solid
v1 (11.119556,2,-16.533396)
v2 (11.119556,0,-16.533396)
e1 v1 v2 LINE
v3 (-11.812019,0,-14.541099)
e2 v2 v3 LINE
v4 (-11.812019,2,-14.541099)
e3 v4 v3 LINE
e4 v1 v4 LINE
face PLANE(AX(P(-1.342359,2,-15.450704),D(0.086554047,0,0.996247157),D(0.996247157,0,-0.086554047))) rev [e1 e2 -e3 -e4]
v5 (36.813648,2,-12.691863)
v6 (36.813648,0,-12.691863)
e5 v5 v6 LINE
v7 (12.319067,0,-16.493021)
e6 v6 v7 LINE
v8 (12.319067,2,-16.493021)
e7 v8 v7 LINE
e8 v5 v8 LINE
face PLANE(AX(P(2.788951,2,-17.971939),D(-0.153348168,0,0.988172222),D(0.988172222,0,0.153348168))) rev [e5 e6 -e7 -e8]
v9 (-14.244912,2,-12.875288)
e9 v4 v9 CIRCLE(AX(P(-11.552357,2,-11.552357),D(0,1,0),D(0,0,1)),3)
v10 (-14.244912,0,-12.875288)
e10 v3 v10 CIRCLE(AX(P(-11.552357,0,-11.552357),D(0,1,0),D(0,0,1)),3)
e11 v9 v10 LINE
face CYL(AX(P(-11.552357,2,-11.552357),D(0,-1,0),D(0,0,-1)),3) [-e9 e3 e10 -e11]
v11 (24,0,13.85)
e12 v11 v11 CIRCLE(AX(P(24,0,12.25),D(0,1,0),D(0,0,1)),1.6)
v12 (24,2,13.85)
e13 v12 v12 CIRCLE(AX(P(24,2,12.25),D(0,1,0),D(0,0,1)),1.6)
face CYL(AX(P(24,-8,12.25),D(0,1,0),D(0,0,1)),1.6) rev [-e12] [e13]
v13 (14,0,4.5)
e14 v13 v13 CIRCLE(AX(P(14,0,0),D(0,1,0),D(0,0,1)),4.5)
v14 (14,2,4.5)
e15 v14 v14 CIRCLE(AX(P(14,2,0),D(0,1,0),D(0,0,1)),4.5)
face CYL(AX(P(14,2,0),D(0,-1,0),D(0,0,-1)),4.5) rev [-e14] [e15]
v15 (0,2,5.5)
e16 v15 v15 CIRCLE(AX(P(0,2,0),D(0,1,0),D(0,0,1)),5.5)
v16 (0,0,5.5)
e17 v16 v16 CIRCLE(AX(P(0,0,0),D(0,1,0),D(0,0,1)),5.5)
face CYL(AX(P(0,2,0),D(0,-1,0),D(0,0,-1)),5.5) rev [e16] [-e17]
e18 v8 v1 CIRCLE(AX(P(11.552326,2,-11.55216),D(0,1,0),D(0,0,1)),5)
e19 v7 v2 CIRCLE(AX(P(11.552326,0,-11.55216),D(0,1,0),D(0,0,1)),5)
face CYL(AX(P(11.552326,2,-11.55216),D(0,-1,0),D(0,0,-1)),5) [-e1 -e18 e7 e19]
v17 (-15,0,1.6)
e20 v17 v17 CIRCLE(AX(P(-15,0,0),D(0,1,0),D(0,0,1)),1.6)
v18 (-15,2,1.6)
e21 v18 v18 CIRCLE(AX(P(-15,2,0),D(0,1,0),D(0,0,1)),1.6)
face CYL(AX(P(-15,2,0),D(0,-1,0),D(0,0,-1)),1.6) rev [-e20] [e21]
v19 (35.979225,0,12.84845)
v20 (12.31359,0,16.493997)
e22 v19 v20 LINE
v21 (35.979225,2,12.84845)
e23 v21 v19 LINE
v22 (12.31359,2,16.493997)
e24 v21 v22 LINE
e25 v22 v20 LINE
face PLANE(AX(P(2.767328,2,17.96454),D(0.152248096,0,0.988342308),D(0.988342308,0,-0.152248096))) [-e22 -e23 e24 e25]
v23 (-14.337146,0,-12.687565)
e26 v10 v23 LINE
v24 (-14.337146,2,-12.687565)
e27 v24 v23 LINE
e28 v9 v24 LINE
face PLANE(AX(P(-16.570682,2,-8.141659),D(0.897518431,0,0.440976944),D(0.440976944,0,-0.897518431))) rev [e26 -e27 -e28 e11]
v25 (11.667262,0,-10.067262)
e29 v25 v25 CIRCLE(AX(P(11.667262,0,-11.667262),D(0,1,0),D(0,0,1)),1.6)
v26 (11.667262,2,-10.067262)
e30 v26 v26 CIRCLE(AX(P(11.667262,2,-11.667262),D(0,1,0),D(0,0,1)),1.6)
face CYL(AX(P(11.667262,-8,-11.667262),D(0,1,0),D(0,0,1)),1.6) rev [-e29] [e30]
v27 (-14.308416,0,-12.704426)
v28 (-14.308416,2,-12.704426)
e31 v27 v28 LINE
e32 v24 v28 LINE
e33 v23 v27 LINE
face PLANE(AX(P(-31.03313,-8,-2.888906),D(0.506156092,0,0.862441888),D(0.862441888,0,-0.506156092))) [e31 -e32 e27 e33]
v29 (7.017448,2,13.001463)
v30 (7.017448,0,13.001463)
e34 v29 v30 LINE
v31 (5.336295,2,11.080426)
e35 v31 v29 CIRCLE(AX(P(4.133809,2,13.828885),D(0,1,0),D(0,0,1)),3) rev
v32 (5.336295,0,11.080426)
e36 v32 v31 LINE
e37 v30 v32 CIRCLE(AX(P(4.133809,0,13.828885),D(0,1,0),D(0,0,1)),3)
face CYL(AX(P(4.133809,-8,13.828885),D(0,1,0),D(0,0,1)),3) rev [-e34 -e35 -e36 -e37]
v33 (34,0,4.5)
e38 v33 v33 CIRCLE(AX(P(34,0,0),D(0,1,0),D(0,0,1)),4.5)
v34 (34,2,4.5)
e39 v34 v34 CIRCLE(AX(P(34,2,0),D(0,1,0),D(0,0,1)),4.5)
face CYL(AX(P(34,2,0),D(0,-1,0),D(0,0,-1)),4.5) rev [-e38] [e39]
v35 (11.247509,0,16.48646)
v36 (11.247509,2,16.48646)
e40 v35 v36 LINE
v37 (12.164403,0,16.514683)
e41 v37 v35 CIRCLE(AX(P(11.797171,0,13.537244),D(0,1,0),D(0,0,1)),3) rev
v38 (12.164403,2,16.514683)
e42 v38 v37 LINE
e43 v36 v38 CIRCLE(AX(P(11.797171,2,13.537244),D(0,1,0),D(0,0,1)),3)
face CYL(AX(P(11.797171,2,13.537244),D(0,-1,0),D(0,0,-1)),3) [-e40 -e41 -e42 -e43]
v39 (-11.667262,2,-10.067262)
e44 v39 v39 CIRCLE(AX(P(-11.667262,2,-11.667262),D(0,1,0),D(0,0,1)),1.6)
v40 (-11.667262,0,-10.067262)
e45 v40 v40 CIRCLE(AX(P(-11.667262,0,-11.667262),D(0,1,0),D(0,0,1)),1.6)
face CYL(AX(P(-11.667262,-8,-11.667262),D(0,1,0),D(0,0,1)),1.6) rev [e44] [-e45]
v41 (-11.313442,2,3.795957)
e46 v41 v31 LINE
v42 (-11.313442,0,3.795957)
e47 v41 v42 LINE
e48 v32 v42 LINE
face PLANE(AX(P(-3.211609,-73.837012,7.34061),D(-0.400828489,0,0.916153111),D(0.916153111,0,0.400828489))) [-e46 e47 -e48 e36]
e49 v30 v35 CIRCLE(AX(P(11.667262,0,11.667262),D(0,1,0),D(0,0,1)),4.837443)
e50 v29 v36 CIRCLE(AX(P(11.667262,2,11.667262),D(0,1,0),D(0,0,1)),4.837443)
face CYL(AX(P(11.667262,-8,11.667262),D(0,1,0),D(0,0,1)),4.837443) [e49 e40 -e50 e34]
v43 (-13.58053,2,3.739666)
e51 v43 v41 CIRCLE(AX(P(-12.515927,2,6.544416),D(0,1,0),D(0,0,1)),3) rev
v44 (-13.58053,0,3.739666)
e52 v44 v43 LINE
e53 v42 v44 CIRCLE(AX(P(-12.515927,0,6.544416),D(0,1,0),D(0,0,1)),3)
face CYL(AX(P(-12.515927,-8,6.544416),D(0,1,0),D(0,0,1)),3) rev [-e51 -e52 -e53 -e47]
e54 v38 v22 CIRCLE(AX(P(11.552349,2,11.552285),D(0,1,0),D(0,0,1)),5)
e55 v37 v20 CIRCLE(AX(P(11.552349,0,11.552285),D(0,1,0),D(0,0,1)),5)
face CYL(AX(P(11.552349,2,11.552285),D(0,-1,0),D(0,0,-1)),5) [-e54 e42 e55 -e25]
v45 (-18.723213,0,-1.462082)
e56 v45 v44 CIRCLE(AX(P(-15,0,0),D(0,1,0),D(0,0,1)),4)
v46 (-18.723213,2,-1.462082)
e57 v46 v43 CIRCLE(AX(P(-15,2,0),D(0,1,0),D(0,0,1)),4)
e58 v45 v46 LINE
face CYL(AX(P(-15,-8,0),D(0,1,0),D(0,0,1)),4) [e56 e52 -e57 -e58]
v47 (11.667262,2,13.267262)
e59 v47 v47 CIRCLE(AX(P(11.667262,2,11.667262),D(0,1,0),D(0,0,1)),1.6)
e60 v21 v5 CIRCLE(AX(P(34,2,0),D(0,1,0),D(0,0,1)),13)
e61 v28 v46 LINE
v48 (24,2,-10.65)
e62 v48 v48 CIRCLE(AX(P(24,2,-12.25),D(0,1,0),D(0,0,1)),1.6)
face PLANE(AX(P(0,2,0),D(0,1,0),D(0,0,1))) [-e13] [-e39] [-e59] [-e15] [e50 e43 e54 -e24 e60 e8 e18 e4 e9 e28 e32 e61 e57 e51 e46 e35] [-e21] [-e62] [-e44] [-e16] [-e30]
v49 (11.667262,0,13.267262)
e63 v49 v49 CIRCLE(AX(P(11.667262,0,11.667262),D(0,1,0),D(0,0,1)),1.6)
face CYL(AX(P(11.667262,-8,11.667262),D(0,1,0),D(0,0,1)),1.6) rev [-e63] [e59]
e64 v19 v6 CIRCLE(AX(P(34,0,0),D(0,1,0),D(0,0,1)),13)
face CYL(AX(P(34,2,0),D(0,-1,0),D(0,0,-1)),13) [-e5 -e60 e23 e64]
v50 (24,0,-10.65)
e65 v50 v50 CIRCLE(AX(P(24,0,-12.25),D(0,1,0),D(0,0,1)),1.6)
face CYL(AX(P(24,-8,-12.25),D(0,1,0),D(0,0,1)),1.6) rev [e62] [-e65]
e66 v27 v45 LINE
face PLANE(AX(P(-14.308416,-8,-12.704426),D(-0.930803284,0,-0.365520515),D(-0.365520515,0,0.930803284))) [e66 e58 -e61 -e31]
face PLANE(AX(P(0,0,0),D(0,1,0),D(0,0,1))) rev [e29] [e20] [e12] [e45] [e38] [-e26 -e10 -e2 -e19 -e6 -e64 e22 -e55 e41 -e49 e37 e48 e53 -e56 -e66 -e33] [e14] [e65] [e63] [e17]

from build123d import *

# Parameters (mm, degrees)
SKETCH1_R           = 1.6
SKETCH1_R_2         = 1
SKETCH1_R_3         = 5.5
SKETCH1_R_4         = 4.5
BOSS_EXTRUDE2_DEPTH = 2
BOSS_EXTRUDE3_START = -2
SKETCH2_R           = 1
BOSS_EXTRUDE3_DEPTH = 2
SKETCH3_R           = 1
CUT_EXTRUDE1_DEPTH  = 103
BOSS_EXTRUDE4_START = -2
SKETCH4_R           = 1.6
BOSS_EXTRUDE4_DEPTH = 2
SKETCH5_R           = 1.6
CUT_EXTRUDE2_DEPTH  = 10
SKETCH6_R           = 1.6
CUT_EXTRUDE3_DEPTH  = 10
BOSS_EXTRUDE5_DEPTH = 2
CUT_EXTRUDE4_DEPTH  = 10
SKETCH10_R          = 1.6
SKETCH10_R_2        = 5.5
SKETCH10_R_3        = 4.5
BOSS_EXTRUDE6_DEPTH = 2
FILLET2_START       = -1
FILLET2_DEPTH       = 4
FILLET2_2_DEPTH     = 2


with BuildPart() as part:
    # Sketch1 → Boss-Extrude2 (new body)
    with BuildSketch(Plane(origin=(0, 0, 0), x_dir=(1, 0, 0), z_dir=(0, 1, 0))):
        with BuildLine():
            Line((12.313589515, -16.493996637), (35.979225245, -12.848450001))
            ThreePointArc((35.979225245, -12.848450001), (46.993067566, -0.424494085), (36.813648041, 12.691862933))
            Line((36.813648041, 12.691862933), (35.165189196, 12.947676785))
            Line((35.165189196, 12.947676785), (12.319067304, 16.493021261))
            ThreePointArc((12.319067304, 16.493021261), (11.720527595, 16.549330191), (11.119556233, 16.533395936))
            Line((11.119556233, 16.533395936), (-11.812019178, 14.541098507))
            ThreePointArc((-11.812019178, 14.541098507), (-13.247239988, 14.027709898), (-14.244912332, 12.87528787))
            Line((-14.244912332, 12.87528787), (-19.487592157, 2.204884721))
            ThreePointArc((-19.487592157, 2.204884721), (-19.693653105, -1.723258696), (-16.994761113, -4.584858569))
            Line((-16.994761113, -4.584858569), (9.557587922, -16.137143667))
            ThreePointArc((9.557587922, -16.137143667), (10.910298182, -16.51089082), (12.313589515, -16.493996637))
        make_face()
        with Locations(Location((11.552349036, -11.552285098, 0), (0, 0, 270))):
            Circle(SKETCH1_R, mode=Mode.SUBTRACT)
        with Locations(Location((25, -11, 0), (0, 0, 270))):
            Circle(SKETCH1_R_2, mode=Mode.SUBTRACT)
        with Locations(Location((-15, 0, 0), (0, 0, 270))):
            Circle(SKETCH1_R, mode=Mode.SUBTRACT)
        with Locations(Location((0, 0, 0), (0, 0, 270))):
            Circle(SKETCH1_R_3, mode=Mode.SUBTRACT)
        with Locations(Location((-11.552357038, 11.552357038, 0), (0, 0, 270))):
            Circle(SKETCH1_R, mode=Mode.SUBTRACT)
        with Locations(Location((11.552326466, 11.552160153, 0), (0, 0, 270))):
            Circle(SKETCH1_R, mode=Mode.SUBTRACT)
        with Locations(Location((14, 0, 0), (0, 0, 270))):
            Circle(SKETCH1_R_4, mode=Mode.SUBTRACT)
        with Locations(Location((34, 0, 0), (0, 0, 270))):
            Circle(SKETCH1_R_4, mode=Mode.SUBTRACT)
        with Locations(Location((25, 11, 0), (0, 0, 270))):
            Circle(SKETCH1_R_2, mode=Mode.SUBTRACT)
    extrude(amount=BOSS_EXTRUDE2_DEPTH)

    # Sketch2 → Boss-Extrude3 (add)
    with BuildSketch(Plane(origin=(0, 2, 0), x_dir=(1, 0, 0), z_dir=(0, 1, 0)).offset(BOSS_EXTRUDE3_START)):
        with Locations((25, 11)):
            Circle(SKETCH2_R)
        with Locations((25, -11)):
            Circle(SKETCH2_R)
    extrude(amount=BOSS_EXTRUDE3_DEPTH)

    # Sketch3 → Cut-Extrude1 (cut)
    with BuildSketch(Plane(origin=(0, 2, 0), x_dir=(1, 0, 0), z_dir=(0, 1, 0))):
        with Locations(Location((24, 13, 0), (0, 0, 270))):
            Circle(SKETCH3_R)
        with Locations(Location((24, -13, 0), (0, 0, 270))):
            Circle(SKETCH3_R)
    extrude(amount=-CUT_EXTRUDE1_DEPTH, mode=Mode.SUBTRACT)

    # Sketch4 → Boss-Extrude4 (add)
    with BuildSketch(Plane(origin=(0, 2, 0), x_dir=(1, 0, 0), z_dir=(0, 1, 0)).offset(BOSS_EXTRUDE4_START)):
        with Locations((-11.552357038, 11.552357038)):
            Circle(SKETCH4_R)
        with Locations((11.552326466, 11.552160153)):
            Circle(SKETCH4_R)
        with Locations((11.552349036, -11.552285098)):
            Circle(SKETCH4_R)
    extrude(amount=BOSS_EXTRUDE4_DEPTH)

    # Sketch5 → Cut-Extrude2 (cut)
    with BuildSketch(Plane(origin=(0, 2, 0), x_dir=(1, 0, 0), z_dir=(0, 1, 0))):
        with Locations(Location((-11.66726189, 11.66726189, 0), (0, 0, 270))):
            Circle(SKETCH5_R)
        with Locations(Location((11.66726189, 11.66726189, 0), (0, 0, 270))):
            Circle(SKETCH5_R)
        with Locations(Location((11.66726189, -11.66726189, 0), (0, 0, 270))):
            Circle(SKETCH5_R)
    extrude(amount=-CUT_EXTRUDE2_DEPTH, mode=Mode.SUBTRACT)

    # Sketch6 → Cut-Extrude3 (cut)
    with BuildSketch(Plane(origin=(0, 2, 0), x_dir=(1, 0, 0), z_dir=(0, 1, 0))):
        with Locations((24, 12.25)):
            Circle(SKETCH6_R)
        with Locations((24, -12.25)):
            Circle(SKETCH6_R)
    extrude(amount=-CUT_EXTRUDE3_DEPTH, mode=Mode.SUBTRACT)

    # Sketch7 → Boss-Extrude5 (add)
    with BuildSketch(Plane(origin=(0, 2, 0), x_dir=(1, 0, 0), z_dir=(0, 1, 0))):
        with BuildLine():
            ThreePointArc((24.746843357, 13.665), (24, 14), (23.253156643, 13.665))
            ThreePointArc((23.253156643, 13.665), (24, 13.85), (24.746843357, 13.665))
        make_face()
        with BuildLine():
            ThreePointArc((23.253156643, -13.665), (24, -13.85), (24.746843357, -13.665))
            ThreePointArc((24.746843357, -13.665), (24, -14), (23.253156643, -13.665))
        make_face()
    extrude(amount=-BOSS_EXTRUDE5_DEPTH)

    # Sketch8 → Cut-Extrude4 (cut)
    with BuildSketch(Plane(origin=(0, 2, 0), x_dir=(1, 0, 0), z_dir=(0, 1, 0))):
        with BuildLine():
            Line((-14.308416207, 12.704426351), (-18.723213135, 1.462082061))
            ThreePointArc((-18.723213135, 1.462082061), (-16.986293656, -3.471978904), (-11.852582747, -2.468555172))
            Line((-11.852582747, -2.468555172), (6.930322315, -10.68631196))
            ThreePointArc((6.930322315, -10.68631196), (7.786759617, -14.555611143), (11.247508844, -16.486459611))
            Line((11.247508844, -16.486459611), (11.232461738, -16.659215907))
            Line((11.232461738, -16.659215907), (-9.768707716, -29.444072038))
            Line((-9.768707716, -29.444072038), (-31.03313029, 2.888905984))
            Line((-31.03313029, 2.888905984), (-14.308416207, 12.704426351))
        make_face()
    extrude(amount=-CUT_EXTRUDE4_DEPTH, mode=Mode.SUBTRACT)

    # Sketch10 → Boss-Extrude6 (add)
    # profile 1 of 3: a face of its own
    with BuildSketch(Plane(origin=(0, 2, 0), x_dir=(1, 0, 0), z_dir=(0, 1, 0))):
        with BuildLine():
            Line((6.930322315, -10.68631196), (-2.461130216, -6.577433566))
            Line((-2.461130216, -6.577433566), (-2.861958704, -7.493586677))
            Line((-2.861958704, -7.493586677), (6.830279674, -11.734062656))
            ThreePointArc((6.830279674, -11.734062656), (6.851720384, -11.207458338), (6.930322315, -10.68631196))
        make_face()
    # profile 2 of 3: a face of its own
    with BuildSketch(Plane(origin=(0, 2, 0), x_dir=(1, 0, 0), z_dir=(0, 1, 0))):
        with BuildLine():
            Line((-2.861958704, -7.493586677), (-2.461130216, -6.577433566))
            Line((-2.461130216, -6.577433566), (-11.852582747, -2.468555172))
            ThreePointArc((-11.852582747, -2.468555172), (-12.214781898, -2.870985915), (-12.628009506, -3.220816837))
            Line((-12.628009506, -3.220816837), (-2.861958704, -7.493586677))
        make_face()
    # profile 3 of 3: a face of its own
    with BuildSketch(Plane(origin=(0, 2, 0), x_dir=(1, 0, 0), z_dir=(0, 1, 0))):
        with BuildLine():
            Line((8.035421862, -12.261327493), (6.830279674, -11.734062656))
            ThreePointArc((6.830279674, -11.734062656), (8.124009767, -14.960622436), (11.247508844, -16.486459611))
            Line((11.247508844, -16.486459611), (11.242611849, -16.542682164))
            ThreePointArc((11.242611849, -16.542682164), (11.779409327, -16.5471268), (12.313589515, -16.493996637))
            Line((12.313589515, -16.493996637), (35.979225245, -12.848450001))
            ThreePointArc((35.979225245, -12.848450001), (46.993067566, -0.424494085), (36.813648041, 12.691862933))
            Line((36.813648041, 12.691862933), (12.319067304, 16.493021261))
            ThreePointArc((12.319067304, 16.493021261), (11.720527595, 16.549330191), (11.119556233, 16.533395936))
            Line((11.119556233, 16.533395936), (-11.812019178, 14.541098507))
            ThreePointArc((-11.812019178, 14.541098507), (-13.247239988, 14.027709898), (-14.244912332, 12.87528787))
            Line((-14.244912332, 12.87528787), (-14.337145922, 12.68756525))
            Line((-14.337145922, 12.68756525), (-14.308416207, 12.704426351))
            Line((-14.308416207, 12.704426351), (-18.723213135, 1.462082061))
            ThreePointArc((-18.723213135, 1.462082061), (-17.436972748, -3.171933767), (-12.628009506, -3.220816837))
            Line((-12.628009506, -3.220816837), (-13.301998386, -2.925938239))
            Line((-13.301998386, -2.925938239), (-11.820094843, -1.440006983))
            Line((-11.820094843, -1.440006983), (-1.105948659, -6.127580457))
            Line((-1.105948659, -6.127580457), (8.611687481, -8.831618339))
            Line((8.611687481, -8.831618339), (8.035421862, -12.261327493))
        make_face()
        with Locations(Location((11.66726189, -11.66726189, 0), (0, 0, 270))):
            Circle(SKETCH10_R, mode=Mode.SUBTRACT)
        with Locations(Location((24, -12.25, 0), (0, 0, 270))):
            Circle(SKETCH10_R, mode=Mode.SUBTRACT)
        with Locations(Location((-15, 0, 0), (0, 0, 270))):
            Circle(SKETCH10_R, mode=Mode.SUBTRACT)
        with Locations(Location((0, 0, 0), (0, 0, 270))):
            Circle(SKETCH10_R_2, mode=Mode.SUBTRACT)
        with Locations(Location((-11.66726189, 11.66726189, 0), (0, 0, 270))):
            Circle(SKETCH10_R, mode=Mode.SUBTRACT)
        with Locations(Location((11.66726189, 11.66726189, 0), (0, 0, 270))):
            Circle(SKETCH10_R, mode=Mode.SUBTRACT)
        with Locations(Location((14, 0, 0), (0, 0, 270))):
            Circle(SKETCH10_R_3, mode=Mode.SUBTRACT)
        with Locations(Location((34, 0, 0), (0, 0, 270))):
            Circle(SKETCH10_R_3, mode=Mode.SUBTRACT)
        with Locations(Location((24, 12.25, 0), (0, 0, 270))):
            Circle(SKETCH10_R, mode=Mode.SUBTRACT)
    extrude(amount=-BOSS_EXTRUDE6_DEPTH)

    # Fillet2: read off the stored shape, not the designer's step
    # Fillet2 outline → Fillet2 (cut)
    with BuildSketch(Plane(origin=(0, 0, 0), x_dir=(1, 0, 0), z_dir=(0, 1, 0)).offset(FILLET2_START)):
        with BuildLine():
            ThreePointArc((11.242611849, -16.542682164), (11.704154362, -16.549980081), (12.16440304, -16.514682694))
            ThreePointArc((12.16440304, -16.514682694), (11.70487082, -16.535823924), (11.247508844, -16.486459611))
            Line((11.247508844, -16.486459611), (11.242611849, -16.542682164))
        make_face()
    extrude(amount=FILLET2_DEPTH, mode=Mode.SUBTRACT)

    # Fillet2 2 outline → Fillet2 2 (add)
    with BuildSketch(Plane(origin=(0, 0, 0), x_dir=(1, 0, 0), z_dir=(0, 1, 0))):
        with BuildLine():
            ThreePointArc((-13.580529798, -3.739666341), (-12.441461916, -3.545340418), (-11.313441681, -3.795956765))
            Line((-11.313441681, -3.795956765), (-12.628009506, -3.220816837))
            ThreePointArc((-12.628009506, -3.220816837), (-13.086601256, -3.512677788), (-13.580529798, -3.739666341))
        make_face()
        with BuildLine():
            ThreePointArc((5.336294885, -11.080425553), (6.391396593, -11.853207748), (7.01744839, -13.001463417))
            ThreePointArc((7.01744839, -13.001463417), (6.88172123, -12.373986651), (6.830279674, -11.734062656))
            Line((6.830279674, -11.734062656), (5.336294885, -11.080425553))
        make_face()
    extrude(amount=FILLET2_2_DEPTH)


solid = part.part
